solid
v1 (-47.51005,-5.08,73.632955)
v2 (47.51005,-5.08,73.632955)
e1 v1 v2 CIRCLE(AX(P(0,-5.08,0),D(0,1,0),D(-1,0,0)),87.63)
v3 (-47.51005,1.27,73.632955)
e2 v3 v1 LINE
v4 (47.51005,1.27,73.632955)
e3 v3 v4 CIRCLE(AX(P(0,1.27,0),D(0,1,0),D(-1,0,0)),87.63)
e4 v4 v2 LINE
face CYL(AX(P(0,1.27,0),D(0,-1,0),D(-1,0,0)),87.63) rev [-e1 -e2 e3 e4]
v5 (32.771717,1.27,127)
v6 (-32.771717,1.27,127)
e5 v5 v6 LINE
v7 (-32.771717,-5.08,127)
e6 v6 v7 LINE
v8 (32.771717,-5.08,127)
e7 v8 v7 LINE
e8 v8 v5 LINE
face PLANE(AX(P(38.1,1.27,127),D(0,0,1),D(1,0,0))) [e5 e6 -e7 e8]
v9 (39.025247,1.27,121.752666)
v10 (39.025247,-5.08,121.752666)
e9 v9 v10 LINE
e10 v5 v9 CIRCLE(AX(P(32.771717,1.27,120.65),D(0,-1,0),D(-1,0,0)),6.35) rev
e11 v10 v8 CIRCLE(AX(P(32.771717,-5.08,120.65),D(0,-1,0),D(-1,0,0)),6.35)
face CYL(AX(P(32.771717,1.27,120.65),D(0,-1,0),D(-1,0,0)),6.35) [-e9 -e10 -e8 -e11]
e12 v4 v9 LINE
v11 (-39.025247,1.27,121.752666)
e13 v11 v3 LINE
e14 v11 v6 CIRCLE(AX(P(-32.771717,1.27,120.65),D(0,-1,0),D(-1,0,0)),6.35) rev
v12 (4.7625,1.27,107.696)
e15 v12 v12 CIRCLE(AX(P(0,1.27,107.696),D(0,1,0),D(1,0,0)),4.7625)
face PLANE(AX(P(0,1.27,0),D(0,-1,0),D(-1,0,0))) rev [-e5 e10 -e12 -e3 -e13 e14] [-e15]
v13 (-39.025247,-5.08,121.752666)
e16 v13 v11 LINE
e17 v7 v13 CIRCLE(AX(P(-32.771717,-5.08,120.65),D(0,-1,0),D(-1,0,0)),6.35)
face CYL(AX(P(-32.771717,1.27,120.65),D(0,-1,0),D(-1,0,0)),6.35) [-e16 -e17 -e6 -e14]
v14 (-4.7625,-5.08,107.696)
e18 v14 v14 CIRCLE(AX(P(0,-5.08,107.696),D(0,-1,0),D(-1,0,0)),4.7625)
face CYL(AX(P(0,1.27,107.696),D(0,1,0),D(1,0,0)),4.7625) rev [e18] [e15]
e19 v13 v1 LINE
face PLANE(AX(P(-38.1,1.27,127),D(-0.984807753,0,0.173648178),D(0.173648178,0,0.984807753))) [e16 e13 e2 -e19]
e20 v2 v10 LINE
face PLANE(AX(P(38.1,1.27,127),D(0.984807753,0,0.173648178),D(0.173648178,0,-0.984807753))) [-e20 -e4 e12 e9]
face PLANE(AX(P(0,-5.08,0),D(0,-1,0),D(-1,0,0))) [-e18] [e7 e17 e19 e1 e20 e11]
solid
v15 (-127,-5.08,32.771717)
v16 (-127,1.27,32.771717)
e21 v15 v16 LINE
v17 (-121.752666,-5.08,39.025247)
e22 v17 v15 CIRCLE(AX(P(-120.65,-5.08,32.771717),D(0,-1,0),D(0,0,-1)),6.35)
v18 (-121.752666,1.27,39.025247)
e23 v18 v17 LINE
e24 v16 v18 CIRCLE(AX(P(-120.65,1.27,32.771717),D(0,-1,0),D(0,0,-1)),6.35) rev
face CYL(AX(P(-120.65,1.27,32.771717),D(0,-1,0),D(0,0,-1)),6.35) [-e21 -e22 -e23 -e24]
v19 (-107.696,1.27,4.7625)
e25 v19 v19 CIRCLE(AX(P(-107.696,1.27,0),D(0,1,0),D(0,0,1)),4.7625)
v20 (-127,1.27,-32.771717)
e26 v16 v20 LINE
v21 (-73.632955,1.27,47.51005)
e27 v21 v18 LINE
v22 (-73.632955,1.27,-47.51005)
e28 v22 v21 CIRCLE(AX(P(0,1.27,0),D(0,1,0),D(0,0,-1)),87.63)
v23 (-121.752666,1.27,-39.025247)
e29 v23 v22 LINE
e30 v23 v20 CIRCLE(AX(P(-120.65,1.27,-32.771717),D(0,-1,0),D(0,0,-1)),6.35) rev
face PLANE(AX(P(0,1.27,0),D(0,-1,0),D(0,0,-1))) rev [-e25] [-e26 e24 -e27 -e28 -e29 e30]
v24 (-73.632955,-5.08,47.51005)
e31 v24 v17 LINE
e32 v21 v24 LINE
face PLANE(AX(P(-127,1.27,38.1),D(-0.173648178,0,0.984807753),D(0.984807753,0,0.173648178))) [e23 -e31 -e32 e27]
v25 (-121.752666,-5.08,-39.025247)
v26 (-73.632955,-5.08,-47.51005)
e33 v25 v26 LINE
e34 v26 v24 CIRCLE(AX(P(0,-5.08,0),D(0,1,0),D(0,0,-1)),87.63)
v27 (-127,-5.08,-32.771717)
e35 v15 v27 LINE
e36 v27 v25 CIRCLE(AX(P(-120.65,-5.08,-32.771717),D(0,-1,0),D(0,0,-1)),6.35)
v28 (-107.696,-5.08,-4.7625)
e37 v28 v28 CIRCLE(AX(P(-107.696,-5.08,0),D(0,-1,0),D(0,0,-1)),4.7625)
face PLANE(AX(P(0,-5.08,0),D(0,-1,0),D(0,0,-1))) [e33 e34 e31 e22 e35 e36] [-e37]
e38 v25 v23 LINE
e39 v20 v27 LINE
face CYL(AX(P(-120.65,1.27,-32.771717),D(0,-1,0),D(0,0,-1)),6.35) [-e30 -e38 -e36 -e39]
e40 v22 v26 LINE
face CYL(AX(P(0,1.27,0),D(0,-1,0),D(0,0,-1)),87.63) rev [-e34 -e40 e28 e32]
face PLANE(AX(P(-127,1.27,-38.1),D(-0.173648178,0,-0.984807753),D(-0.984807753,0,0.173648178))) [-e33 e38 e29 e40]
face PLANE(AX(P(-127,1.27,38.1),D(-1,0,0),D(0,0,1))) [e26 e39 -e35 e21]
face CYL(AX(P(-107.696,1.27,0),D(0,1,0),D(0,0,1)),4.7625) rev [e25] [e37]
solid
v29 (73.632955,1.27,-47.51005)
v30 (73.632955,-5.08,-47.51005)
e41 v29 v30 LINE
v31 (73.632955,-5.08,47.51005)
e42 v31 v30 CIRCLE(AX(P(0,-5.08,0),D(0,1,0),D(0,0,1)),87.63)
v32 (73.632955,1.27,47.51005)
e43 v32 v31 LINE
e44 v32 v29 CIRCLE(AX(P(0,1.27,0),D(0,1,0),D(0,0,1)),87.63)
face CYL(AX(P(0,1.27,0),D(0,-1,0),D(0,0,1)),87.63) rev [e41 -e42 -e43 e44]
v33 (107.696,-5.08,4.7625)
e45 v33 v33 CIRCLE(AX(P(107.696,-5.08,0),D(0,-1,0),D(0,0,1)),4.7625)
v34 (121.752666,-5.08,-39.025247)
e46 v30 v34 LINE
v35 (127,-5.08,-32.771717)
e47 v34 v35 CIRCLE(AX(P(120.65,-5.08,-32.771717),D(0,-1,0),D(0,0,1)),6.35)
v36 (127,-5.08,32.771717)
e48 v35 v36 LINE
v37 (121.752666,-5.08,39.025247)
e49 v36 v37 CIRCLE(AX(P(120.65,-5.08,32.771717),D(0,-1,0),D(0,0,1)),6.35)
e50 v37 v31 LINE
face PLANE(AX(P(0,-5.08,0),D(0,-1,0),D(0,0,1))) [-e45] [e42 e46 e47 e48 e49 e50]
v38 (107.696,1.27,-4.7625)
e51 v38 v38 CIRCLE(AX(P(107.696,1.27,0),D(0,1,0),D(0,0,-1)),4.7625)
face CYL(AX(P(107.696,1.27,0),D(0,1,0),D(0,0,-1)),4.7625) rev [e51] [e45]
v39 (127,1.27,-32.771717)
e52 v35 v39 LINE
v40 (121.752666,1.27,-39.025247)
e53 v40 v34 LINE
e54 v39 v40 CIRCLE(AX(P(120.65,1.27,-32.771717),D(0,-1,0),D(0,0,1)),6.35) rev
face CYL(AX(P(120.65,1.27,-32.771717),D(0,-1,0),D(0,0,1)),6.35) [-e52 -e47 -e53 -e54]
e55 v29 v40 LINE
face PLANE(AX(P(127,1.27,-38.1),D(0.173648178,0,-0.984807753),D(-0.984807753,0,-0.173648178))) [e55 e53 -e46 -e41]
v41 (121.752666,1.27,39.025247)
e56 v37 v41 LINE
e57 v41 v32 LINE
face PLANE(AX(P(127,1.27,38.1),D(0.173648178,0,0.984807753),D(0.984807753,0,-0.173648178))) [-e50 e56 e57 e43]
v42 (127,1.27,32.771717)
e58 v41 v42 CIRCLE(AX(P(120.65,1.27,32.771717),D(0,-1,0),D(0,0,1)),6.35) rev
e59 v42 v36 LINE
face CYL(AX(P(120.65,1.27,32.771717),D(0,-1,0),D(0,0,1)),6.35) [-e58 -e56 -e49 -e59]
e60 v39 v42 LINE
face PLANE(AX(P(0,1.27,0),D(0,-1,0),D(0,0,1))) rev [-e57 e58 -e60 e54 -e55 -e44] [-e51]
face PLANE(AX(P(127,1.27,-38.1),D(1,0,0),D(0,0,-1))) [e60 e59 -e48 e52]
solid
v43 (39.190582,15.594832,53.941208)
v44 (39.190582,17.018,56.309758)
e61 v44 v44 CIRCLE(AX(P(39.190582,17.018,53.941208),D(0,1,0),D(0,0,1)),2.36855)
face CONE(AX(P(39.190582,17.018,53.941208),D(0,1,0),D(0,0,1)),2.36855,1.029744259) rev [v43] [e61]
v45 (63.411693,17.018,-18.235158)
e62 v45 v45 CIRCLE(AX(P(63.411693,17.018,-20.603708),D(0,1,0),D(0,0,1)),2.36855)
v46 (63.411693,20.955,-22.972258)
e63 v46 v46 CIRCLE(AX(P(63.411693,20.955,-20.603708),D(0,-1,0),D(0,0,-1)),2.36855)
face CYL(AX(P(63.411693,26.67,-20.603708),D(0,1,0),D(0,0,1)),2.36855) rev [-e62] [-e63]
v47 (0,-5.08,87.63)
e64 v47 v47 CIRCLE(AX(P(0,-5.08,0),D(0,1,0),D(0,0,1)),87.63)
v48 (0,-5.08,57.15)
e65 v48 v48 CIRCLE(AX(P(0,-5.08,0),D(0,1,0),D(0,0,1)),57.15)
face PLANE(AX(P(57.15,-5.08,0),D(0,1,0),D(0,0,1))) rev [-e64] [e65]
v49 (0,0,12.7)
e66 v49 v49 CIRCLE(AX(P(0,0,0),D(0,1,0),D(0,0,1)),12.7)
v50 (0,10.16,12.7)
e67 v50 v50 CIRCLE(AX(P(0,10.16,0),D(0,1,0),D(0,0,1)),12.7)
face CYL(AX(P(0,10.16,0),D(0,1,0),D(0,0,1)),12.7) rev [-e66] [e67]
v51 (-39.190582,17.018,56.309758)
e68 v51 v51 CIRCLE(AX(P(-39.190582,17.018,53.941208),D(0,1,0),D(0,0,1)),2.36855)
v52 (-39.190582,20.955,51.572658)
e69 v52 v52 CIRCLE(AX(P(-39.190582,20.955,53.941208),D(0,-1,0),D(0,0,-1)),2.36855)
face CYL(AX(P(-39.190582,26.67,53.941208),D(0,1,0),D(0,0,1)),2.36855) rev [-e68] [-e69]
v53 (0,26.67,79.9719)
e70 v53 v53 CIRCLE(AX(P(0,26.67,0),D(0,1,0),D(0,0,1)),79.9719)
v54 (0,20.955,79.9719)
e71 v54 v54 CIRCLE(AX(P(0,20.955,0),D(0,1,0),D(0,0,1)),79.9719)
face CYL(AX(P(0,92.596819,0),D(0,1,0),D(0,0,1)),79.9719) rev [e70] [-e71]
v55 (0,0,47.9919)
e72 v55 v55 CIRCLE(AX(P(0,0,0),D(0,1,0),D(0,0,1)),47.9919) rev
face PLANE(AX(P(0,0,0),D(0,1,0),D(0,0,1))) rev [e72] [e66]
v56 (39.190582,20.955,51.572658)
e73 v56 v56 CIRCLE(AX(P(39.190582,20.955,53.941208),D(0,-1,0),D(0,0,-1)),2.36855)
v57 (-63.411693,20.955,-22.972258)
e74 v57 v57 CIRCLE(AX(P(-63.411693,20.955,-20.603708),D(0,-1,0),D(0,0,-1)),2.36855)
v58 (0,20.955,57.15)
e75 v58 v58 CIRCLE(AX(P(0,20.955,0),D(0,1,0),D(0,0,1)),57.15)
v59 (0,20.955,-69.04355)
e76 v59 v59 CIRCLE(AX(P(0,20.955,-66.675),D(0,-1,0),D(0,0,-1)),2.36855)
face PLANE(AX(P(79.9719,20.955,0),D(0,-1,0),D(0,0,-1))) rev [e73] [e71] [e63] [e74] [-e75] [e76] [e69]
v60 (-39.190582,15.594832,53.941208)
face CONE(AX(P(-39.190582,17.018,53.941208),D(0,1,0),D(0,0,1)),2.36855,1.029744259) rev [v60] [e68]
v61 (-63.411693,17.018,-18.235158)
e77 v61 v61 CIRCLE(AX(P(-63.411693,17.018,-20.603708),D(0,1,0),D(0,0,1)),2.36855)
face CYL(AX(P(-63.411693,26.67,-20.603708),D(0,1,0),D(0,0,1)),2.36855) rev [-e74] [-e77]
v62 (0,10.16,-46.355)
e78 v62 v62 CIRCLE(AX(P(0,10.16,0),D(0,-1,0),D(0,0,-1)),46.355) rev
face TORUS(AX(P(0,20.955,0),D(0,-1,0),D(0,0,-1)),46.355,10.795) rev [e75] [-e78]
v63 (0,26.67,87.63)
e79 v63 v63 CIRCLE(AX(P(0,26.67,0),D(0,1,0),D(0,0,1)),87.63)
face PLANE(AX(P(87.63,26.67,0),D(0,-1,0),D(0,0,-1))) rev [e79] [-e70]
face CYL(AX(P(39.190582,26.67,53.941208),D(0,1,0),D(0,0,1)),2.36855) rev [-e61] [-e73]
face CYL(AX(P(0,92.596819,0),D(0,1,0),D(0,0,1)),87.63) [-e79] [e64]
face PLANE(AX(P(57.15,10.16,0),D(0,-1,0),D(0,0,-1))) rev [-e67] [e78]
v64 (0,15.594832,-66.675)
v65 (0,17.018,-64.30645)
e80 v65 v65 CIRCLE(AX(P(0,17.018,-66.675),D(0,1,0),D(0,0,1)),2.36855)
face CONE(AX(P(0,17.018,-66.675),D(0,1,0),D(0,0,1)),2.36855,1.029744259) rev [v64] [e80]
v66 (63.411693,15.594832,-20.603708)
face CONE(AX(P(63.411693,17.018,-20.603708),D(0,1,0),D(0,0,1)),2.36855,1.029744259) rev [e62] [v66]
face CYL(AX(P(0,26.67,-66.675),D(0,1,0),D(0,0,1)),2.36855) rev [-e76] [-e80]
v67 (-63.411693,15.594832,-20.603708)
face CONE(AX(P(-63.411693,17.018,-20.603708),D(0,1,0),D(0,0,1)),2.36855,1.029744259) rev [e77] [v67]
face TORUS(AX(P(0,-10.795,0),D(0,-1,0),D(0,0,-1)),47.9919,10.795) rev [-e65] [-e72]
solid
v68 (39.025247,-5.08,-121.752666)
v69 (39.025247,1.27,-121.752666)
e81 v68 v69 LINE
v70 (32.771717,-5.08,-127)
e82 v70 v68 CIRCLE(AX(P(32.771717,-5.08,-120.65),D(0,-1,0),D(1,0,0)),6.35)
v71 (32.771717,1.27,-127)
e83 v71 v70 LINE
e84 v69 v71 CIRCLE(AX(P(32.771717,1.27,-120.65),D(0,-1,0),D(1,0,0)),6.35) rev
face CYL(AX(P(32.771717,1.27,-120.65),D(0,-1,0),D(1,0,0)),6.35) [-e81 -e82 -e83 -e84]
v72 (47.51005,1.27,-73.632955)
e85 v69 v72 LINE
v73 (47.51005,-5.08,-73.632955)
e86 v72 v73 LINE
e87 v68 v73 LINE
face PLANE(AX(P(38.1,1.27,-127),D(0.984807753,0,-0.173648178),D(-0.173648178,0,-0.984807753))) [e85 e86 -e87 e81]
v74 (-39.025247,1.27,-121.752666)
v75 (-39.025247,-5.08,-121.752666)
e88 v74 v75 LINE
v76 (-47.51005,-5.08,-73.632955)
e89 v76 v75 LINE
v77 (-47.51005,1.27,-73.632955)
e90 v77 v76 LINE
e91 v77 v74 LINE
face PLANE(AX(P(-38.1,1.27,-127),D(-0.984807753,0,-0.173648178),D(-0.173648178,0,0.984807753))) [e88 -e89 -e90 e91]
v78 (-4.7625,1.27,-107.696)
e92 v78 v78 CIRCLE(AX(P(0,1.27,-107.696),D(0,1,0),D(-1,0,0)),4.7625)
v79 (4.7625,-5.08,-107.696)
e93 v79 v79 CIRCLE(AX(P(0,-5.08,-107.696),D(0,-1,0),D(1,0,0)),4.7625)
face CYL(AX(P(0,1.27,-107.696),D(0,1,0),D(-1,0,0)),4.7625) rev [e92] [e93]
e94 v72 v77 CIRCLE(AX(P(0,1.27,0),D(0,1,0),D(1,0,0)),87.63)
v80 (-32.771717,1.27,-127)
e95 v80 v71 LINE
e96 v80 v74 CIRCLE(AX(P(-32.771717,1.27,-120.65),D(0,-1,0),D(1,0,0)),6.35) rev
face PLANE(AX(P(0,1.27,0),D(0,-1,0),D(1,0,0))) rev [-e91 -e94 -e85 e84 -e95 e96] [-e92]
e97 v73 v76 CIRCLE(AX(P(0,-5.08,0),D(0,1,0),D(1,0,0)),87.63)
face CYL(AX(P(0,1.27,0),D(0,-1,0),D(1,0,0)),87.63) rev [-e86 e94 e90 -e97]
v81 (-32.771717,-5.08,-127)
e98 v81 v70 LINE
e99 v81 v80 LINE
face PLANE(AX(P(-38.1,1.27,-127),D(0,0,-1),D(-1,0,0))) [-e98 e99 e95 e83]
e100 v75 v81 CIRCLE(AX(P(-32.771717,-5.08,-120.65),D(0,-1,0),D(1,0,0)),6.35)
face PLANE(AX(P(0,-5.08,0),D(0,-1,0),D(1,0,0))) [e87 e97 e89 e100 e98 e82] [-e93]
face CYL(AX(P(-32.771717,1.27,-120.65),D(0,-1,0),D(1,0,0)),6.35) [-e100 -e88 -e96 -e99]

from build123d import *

# Parameters (mm, degrees)
F_3_16_0_1865_DIAMETER_HOLE1_AT_2_COUNT = 2
F_3_16_0_1865_DIAMETER_HOLE1_AT_2_PITCH = 181.676687383
CIRPATTERN2_COUNT                       = 5
F_1_1_DIAMETER_HOLE1_D                  = 25.4
BOSS_EXTRUDE1_DEPTH                     = 6.35
FILLET2_R                               = 6.35
CIRPATTERN4_COUNT                       = 4
FILLET3_R                               = 10.795


with BuildPart() as part:
    # Sketch1 → Revolve1 (revolve)
    with BuildSketch(Plane.XY, mode=Mode.PRIVATE) as revolve1_sk:
        Polygon((87.63, -5.08), (87.63, 26.67), (79.9719, 26.67), (79.9719, 20.955), (57.15, 20.955), (57.15, 10.16), (0, 10.16), (0, 0), (57.15, 0), (57.15, -5.08), align=None)
    revolve(revolve1_sk.sketch.rotate(Axis((0, 92.596818824, 0), (0, -1, 0)), 90), axis=Axis((0, 92.596818824, 0), (0, -1, 0)))

    # Sketch6 → 3/16 (0.1865) Diameter Hole1 (revolve, cut)
    with BuildSketch(Plane(origin=(0, 26.67, -66.675), x_dir=(0, 0, 1), z_dir=(1, 0, 0))):
        Polygon((0, 0), (0, 11.075168419), (2.36855, 9.652), (2.36855, 0), align=None)
    f_3_16_0_1865_diameter_hole1 = revolve(axis=Axis((0, 33.02, -66.675), (0, -1, 0)), mode=Mode.SUBTRACT)

    # 3/16 (0.1865) Diameter Hole1 at 2: 3/16 (0.1865) Diameter Hole1 ×2
    with Locations(*[Vector(-0.6277965872660483, 0, 0.778377443800309) * (i * F_3_16_0_1865_DIAMETER_HOLE1_AT_2_PITCH) for i in range(1, F_3_16_0_1865_DIAMETER_HOLE1_AT_2_COUNT)]):
        add(f_3_16_0_1865_diameter_hole1, mode=Mode.SUBTRACT)

    # CirPattern2: 3/16 (0.1865) Diameter Hole1 ×5 about axis
    cirpattern2_axis = Axis((0, 0, 0), (0, 1, 0))
    for i in range(1, CIRPATTERN2_COUNT):
        add(f_3_16_0_1865_diameter_hole1.rotate(cirpattern2_axis, i * 360 / CIRPATTERN2_COUNT), mode=Mode.SUBTRACT)

    # CirPattern2 copy 1 sketch → CirPattern2 copy 1 (revolve, cut)
    with BuildSketch(Plane(origin=(35.834852053, 26.67, 131.569029239), x_dir=(0.9510565162951535, 0, 0.30901699437494745), z_dir=(0.30901699437494745, 0, -0.9510565162951535))):
        Polygon((0, 0), (0, 11.075168419), (2.36855, 9.652), (2.36855, 0), align=None)
    revolve(axis=Axis((35.834852053, 33.02, 131.569029239), (0, -1, 0)), mode=Mode.SUBTRACT)

    # CirPattern2 copy 2 sketch → CirPattern2 copy 2 (revolve, cut)
    with BuildSketch(Plane(origin=(136.203160876, 26.67, 6.576096413), x_dir=(0.5877852522924732, 0, -0.8090169943749473), z_dir=(-0.8090169943749473, 0, -0.5877852522924732))):
        Polygon((0, 0), (0, 11.075168419), (2.36855, 9.652), (2.36855, 0), align=None)
    revolve(axis=Axis((136.203160876, 33.02, 6.576096413), (0, -1, 0)), mode=Mode.SUBTRACT)

    # CirPattern2 copy 3 sketch → CirPattern2 copy 3 (revolve, cut)
    with BuildSketch(Plane(origin=(48.343330743, 26.67, -127.504778142), x_dir=(-0.587785252292473, 0, -0.8090169943749476), z_dir=(-0.8090169943749476, 0, 0.587785252292473))):
        Polygon((0, 0), (0, 11.075168419), (2.36855, 9.652), (2.36855, 0), align=None)
    revolve(axis=Axis((48.343330743, 33.02, -127.504778142), (0, -1, 0)), mode=Mode.SUBTRACT)

    # CirPattern2 copy 4 sketch → CirPattern2 copy 4 (revolve, cut)
    with BuildSketch(Plane(origin=(-106.325339347, 26.67, -85.378383033), x_dir=(-0.9510565162951536, 0, 0.30901699437494723), z_dir=(0.30901699437494723, 0, 0.9510565162951536))):
        Polygon((0, 0), (0, 11.075168419), (2.36855, 9.652), (2.36855, 0), align=None)
    revolve(axis=Axis((-106.325339347, 33.02, -85.378383033), (0, -1, 0)), mode=Mode.SUBTRACT)

    # 1 (1) Diameter Hole1 (through all)
    with Locations(Plane(origin=(0, 10.16, 0), x_dir=(1, 0, 0), z_dir=(0, 1, 0))):
        with Locations((0, 0)):
            Hole(F_1_1_DIAMETER_HOLE1_D / 2)

    # Fillet3
    # the kernel refuses this fillet: 10.795 mm, written as the material it adds along each edge
    with BuildSketch(Plane(origin=(0, 10.16, 0), x_dir=(0, 0, 1), z_dir=(1, 0, 0))) as fillet3_piece_1:
        with BuildLine():
            CenterArc((57.15 - FILLET3_R, -FILLET3_R), FILLET3_R, 0, 90)
            Line((57.15 - FILLET3_R, 0), (57.15 - FILLET3_R, FILLET3_R * 0.02))
            Line((57.15 - FILLET3_R, FILLET3_R * 0.02), (57.15 + FILLET3_R * 0.02, FILLET3_R * 0.02))
            Line((57.15 + FILLET3_R * 0.02, FILLET3_R * 0.02), (57.15 + FILLET3_R * 0.02, -FILLET3_R))
            Line((57.15 + FILLET3_R * 0.02, -FILLET3_R), (57.15, -FILLET3_R))
        make_face()
    revolve(axis=Axis((0, 10.16, 0), (0, -1, 0)))
    with BuildSketch(Plane(origin=(0, 0, 0), x_dir=(0, 0, 1), z_dir=(1, 0, 0))) as fillet3_piece_2:
        with BuildLine():
            CenterArc((47.99189976, 10.795), FILLET3_R, 270, 58.034281249)
            Line((47.99189976, 0), (47.99189976, -0.2159))
            Line((47.99189976, -0.2159), (57.15, -0.2159))
            Line((57.15, -0.2159), (57.3659, 0))
            ThreePointArc((57.3659, 0), (57.3659, 2.54), (57.333162005, 4.9657))
            Line((57.333162005, 4.9657), (57.15, 5.08))
        make_face()
    revolve(axis=Axis((0, 0, 0), (0, -1, 0)))


with BuildPart() as body_2:
    # Sketch15 → Boss-Extrude1 (new body)
    with BuildSketch(Plane.XZ.offset(5.08)):
        with BuildLine():
            Line((-127, -38.1), (-73.632954963, -47.510049921))
            ThreePointArc((-73.632954963, -47.510049921), (-87.63, 0), (-73.632954963, 47.510049921))
            Line((-73.632954963, 47.510049921), (-127, 38.1))
            Line((-127, 38.1), (-127, -38.1))
        make_face()
    extrude(amount=-BOSS_EXTRUDE1_DEPTH)

    # Fillet2
    fillet2_edges = [body_2.edges().sort_by_distance(p)[0] for p in [
        (-127, -1.905, 38.1),
        (-127, -1.905, -38.1),
    ]]
    fillet(fillet2_edges, radius=FILLET2_R)

    # Sketch17 → 3/8 (0.375) Diameter Hole1 (revolve, cut)
    with BuildSketch(Plane(origin=(-107.696, 1.27, 0), x_dir=(0, 0, 1), z_dir=(1, 0, 0))):
        Polygon((0, 0), (0, 28.261598698), (4.7625, 25.4), (4.7625, 0), align=None)
    revolve(axis=Axis((-107.696, 7.62, 0), (0, -1, 0)), mode=Mode.SUBTRACT)


with BuildPart() as cirpattern4_1:
    # CirPattern4: pattern copy
    add(body_2.part.rotate(Axis((0, 0, 0), (0, 1, 0)), 1 * 360 / CIRPATTERN4_COUNT))


with BuildPart() as cirpattern4_2:
    # CirPattern4: pattern copy
    add(body_2.part.rotate(Axis((0, 0, 0), (0, 1, 0)), 2 * 360 / CIRPATTERN4_COUNT))


with BuildPart() as cirpattern4_3:
    # CirPattern4: pattern copy
    add(body_2.part.rotate(Axis((0, 0, 0), (0, 1, 0)), 3 * 360 / CIRPATTERN4_COUNT))


solid = Compound([part.part, body_2.part, cirpattern4_1.part, cirpattern4_2.part, cirpattern4_3.part])
